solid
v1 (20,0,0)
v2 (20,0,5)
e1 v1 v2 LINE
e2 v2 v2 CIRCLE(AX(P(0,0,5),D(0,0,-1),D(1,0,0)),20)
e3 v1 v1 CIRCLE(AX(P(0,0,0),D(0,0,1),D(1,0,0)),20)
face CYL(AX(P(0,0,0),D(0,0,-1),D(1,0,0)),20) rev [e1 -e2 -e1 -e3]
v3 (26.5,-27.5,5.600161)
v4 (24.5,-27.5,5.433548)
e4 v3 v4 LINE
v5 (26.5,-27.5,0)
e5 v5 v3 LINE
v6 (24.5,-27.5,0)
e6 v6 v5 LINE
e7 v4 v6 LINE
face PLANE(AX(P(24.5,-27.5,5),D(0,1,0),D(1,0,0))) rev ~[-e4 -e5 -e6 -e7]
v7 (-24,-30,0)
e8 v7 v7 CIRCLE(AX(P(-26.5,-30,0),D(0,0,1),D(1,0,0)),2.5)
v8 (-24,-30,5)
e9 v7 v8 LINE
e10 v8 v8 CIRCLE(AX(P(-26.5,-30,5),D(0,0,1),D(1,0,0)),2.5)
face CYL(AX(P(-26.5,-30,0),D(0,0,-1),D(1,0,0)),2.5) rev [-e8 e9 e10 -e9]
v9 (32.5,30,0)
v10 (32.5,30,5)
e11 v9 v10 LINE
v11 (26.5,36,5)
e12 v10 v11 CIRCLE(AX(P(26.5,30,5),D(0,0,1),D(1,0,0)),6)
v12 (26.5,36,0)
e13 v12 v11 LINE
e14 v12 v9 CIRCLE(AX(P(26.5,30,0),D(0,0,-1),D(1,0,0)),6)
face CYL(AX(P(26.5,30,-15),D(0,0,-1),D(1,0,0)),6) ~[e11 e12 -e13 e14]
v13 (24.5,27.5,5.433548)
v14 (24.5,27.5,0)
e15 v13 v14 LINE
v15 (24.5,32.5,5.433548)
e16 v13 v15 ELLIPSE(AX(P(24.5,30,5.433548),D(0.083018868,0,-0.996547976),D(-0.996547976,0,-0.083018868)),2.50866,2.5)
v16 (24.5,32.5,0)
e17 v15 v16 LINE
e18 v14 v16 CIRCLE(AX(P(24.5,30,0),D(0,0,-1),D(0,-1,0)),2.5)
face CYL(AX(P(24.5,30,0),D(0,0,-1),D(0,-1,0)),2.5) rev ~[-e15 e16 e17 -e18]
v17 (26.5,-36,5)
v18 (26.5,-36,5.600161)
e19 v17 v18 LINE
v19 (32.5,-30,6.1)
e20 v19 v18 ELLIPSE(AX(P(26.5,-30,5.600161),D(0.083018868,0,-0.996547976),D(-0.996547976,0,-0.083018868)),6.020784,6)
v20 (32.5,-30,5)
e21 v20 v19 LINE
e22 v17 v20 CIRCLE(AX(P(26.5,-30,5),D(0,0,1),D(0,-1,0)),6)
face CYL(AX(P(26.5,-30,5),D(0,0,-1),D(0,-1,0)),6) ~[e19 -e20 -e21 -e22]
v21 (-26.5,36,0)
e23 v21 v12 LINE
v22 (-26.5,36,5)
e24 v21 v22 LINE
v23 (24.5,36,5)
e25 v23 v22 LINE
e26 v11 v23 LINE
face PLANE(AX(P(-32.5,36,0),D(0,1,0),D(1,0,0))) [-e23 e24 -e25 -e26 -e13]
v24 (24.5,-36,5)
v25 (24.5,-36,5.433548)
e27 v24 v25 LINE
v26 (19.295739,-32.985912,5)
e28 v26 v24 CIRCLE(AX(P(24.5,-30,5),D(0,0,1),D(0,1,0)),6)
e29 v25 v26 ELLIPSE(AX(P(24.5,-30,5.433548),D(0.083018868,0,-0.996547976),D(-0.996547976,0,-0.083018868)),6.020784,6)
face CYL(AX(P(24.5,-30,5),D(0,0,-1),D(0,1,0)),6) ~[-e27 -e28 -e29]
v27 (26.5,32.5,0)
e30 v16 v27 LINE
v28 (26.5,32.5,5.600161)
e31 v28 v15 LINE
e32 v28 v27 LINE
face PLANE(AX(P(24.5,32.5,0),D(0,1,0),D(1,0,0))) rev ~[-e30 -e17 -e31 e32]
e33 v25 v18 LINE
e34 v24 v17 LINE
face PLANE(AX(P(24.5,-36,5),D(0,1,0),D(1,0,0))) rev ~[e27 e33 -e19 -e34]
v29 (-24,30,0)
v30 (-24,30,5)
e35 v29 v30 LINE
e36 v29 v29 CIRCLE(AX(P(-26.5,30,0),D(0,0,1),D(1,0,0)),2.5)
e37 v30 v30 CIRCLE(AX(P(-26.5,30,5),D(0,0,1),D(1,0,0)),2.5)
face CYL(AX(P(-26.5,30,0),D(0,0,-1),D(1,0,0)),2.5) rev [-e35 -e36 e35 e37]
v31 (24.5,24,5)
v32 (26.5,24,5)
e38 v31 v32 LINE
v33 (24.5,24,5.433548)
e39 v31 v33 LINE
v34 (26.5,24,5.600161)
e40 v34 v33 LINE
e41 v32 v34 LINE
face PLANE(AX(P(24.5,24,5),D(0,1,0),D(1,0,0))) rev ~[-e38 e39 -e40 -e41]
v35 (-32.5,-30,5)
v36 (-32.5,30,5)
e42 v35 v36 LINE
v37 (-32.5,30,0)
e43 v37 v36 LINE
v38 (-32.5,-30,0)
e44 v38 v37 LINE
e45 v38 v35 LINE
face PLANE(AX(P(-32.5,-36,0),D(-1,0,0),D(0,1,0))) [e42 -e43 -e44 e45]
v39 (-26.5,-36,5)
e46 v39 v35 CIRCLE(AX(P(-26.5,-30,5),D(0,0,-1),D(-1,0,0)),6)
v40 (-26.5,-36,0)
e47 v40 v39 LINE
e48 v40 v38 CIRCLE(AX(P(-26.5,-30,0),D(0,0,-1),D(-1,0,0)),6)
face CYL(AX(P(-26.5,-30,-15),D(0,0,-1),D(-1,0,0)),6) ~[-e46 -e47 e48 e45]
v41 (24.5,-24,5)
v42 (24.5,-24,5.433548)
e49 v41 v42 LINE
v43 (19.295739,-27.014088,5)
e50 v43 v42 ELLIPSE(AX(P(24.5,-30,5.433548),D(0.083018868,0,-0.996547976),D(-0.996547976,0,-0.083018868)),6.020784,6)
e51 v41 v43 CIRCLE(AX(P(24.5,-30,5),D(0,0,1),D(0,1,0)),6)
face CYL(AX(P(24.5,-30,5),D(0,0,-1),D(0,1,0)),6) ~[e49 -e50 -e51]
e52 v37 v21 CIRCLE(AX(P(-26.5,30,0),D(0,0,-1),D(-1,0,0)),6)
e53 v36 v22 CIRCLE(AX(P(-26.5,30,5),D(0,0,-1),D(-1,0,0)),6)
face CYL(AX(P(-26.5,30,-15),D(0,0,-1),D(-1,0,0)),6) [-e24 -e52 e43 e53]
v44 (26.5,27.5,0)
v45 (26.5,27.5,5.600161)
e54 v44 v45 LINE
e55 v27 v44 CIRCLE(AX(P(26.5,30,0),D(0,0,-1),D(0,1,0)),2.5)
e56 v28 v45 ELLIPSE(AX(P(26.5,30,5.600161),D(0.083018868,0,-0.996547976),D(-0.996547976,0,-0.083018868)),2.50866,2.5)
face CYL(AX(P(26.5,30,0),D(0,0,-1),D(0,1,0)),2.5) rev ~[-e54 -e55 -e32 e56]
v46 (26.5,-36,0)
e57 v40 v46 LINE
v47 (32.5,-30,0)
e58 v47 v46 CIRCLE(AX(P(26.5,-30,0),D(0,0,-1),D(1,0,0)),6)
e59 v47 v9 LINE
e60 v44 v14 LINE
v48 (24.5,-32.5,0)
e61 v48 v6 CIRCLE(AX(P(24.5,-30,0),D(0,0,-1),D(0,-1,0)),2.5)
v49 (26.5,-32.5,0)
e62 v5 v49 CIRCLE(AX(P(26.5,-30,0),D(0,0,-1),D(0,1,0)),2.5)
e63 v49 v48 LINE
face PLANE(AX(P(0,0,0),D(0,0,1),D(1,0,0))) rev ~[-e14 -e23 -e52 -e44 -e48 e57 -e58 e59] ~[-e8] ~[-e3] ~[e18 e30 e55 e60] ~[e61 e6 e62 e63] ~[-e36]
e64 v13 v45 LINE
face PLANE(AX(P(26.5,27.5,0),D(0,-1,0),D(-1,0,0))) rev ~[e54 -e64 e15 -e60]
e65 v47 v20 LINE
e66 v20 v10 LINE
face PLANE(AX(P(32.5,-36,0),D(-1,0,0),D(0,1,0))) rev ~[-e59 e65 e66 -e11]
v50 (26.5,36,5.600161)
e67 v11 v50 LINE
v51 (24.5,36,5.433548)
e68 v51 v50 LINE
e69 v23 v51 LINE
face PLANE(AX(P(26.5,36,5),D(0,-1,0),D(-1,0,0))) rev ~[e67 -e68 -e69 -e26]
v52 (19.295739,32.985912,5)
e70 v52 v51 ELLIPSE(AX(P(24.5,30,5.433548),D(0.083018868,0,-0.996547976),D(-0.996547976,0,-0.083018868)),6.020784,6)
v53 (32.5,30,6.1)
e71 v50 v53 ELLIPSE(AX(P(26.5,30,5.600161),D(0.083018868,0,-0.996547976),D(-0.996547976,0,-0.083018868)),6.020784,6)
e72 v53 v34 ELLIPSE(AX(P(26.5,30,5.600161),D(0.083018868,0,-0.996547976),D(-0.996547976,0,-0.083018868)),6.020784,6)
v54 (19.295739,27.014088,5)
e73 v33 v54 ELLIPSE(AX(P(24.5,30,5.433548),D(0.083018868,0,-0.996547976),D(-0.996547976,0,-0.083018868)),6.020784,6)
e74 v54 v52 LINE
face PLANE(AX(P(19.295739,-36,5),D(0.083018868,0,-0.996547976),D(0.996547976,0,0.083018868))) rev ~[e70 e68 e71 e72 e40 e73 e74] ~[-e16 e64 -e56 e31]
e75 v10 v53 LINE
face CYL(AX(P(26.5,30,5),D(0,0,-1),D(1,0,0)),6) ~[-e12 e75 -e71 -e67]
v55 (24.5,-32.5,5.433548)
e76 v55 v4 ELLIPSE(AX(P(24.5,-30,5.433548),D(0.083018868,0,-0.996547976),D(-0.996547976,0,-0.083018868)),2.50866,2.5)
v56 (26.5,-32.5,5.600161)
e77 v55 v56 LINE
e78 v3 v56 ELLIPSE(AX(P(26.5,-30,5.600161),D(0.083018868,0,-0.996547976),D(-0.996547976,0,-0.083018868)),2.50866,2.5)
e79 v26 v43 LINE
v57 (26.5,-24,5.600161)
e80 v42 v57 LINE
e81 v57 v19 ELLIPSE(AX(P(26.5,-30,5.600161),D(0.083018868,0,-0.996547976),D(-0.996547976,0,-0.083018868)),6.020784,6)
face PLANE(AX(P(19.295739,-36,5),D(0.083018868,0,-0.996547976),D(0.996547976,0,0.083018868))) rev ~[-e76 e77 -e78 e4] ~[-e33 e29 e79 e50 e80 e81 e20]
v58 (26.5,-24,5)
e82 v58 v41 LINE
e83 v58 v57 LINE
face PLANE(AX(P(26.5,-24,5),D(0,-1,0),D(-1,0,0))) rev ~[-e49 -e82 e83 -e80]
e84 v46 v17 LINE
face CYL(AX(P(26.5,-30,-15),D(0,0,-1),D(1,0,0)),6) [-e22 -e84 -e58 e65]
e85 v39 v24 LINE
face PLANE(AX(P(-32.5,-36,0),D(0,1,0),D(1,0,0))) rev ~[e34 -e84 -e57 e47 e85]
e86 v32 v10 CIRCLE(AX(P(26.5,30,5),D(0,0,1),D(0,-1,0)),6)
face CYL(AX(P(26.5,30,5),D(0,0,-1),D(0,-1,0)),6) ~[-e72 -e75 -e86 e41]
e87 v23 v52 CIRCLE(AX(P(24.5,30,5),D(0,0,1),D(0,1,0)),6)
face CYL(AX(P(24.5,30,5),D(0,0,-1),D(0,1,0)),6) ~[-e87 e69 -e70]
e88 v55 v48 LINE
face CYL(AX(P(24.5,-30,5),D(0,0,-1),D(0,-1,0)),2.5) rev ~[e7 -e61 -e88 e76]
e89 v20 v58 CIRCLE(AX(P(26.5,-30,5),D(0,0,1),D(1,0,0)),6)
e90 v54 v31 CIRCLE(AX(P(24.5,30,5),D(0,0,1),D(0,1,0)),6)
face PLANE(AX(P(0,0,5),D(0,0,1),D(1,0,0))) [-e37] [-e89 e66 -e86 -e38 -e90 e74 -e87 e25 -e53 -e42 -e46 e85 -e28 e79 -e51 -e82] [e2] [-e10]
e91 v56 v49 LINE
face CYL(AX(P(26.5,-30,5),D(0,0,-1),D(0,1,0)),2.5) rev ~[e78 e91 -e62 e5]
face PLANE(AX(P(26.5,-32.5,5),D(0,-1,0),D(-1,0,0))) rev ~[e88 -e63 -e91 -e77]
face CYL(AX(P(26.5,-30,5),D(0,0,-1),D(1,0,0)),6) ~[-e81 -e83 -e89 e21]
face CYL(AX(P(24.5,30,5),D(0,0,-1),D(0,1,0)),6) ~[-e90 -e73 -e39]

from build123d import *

# Parameters (mm, degrees)
F0_W        = 65
F0_H        = 72
F0_R        = 2.5
F0_R_2      = 20
F1_DEPTH    = 5
F3_DEPTH    = 1.1
F5_DEPTH    = 72.001
F6_T1_DEPTH = 35


# Not quite as in the source:
# - a fillet or chamfer that OpenCascade refuses, or shapes differently, is made with other operations: its cross-section is extruded or revolved along the edge and cut away or added


with BuildPart() as f1:
    # F0 (on Top) → F1 (new body)
    with BuildSketch(Plane.XY):
        Rectangle(F0_W, F0_H)
        with Locations((-26.5, -30)):
            Circle(F0_R, mode=Mode.SUBTRACT)
        with BuildLine():
            Line((26.5, -32.5), (24.5, -32.5))
            ThreePointArc((24.5, -32.5), (22, -30), (24.5, -27.5))
            Line((24.5, -27.5), (26.5, -27.5))
            ThreePointArc((26.5, -27.5), (29, -30), (26.5, -32.5))
        make_face(mode=Mode.SUBTRACT)
        with Locations((-26.5, 30)):
            Circle(F0_R, mode=Mode.SUBTRACT)
        Circle(F0_R_2, mode=Mode.SUBTRACT)
        with BuildLine():
            Line((26.5, 27.5), (24.5, 27.5))
            ThreePointArc((24.5, 27.5), (22, 30), (24.5, 32.5))
            Line((24.5, 32.5), (26.5, 32.5))
            ThreePointArc((26.5, 32.5), (29, 30), (26.5, 27.5))
        make_face(mode=Mode.SUBTRACT)
    extrude(amount=F1_DEPTH)

    # F2 (on face) → F3 (join)
    with BuildSketch(Plane.XY.offset(5)):
        with BuildLine():
            Line((26.5, -24.0000002086), (24.5, -24.0000002086))
            ThreePointArc((24.5, -24.0000002086), (18.5000002086, -30), (24.5, -35.9999997914))
            Line((24.5, -35.9999997914), (26.5, -35.9999997914))
            ThreePointArc((26.5, -35.9999997914), (30.7426405396, -34.2426405396), (32.4999997914, -30))
            ThreePointArc((32.4999997914, -30), (30.7426405396, -25.7573594604), (26.5, -24.0000002086))
        make_face()
        with BuildLine():
            ThreePointArc((26.5, -27.5), (29, -30), (26.5, -32.5))
            Line((26.5, -32.5), (24.5, -32.5))
            ThreePointArc((24.5, -32.5), (22, -30), (24.5, -27.5))
            Line((24.5, -27.5), (26.5, -27.5))
        make_face(mode=Mode.SUBTRACT)
        with BuildLine():
            ThreePointArc((26.5, 24.0000002086), (30.7426405396, 25.7573594604), (32.4999997914, 30))
            ThreePointArc((32.4999997914, 30), (30.7426405396, 34.2426405396), (26.5, 35.9999997914))
            Line((26.5, 35.9999997914), (24.5, 35.9999997914))
            ThreePointArc((24.5, 35.9999997914), (18.5000002086, 30), (24.5, 24.0000002086))
            Line((24.5, 24.0000002086), (26.5, 24.0000002086))
        make_face()
        with BuildLine():
            ThreePointArc((26.5, 32.5), (29, 30), (26.5, 27.5))
            Line((26.5, 27.5), (24.5, 27.5))
            ThreePointArc((24.5, 27.5), (22, 30), (24.5, 32.5))
            Line((24.5, 32.5), (26.5, 32.5))
        make_face(mode=Mode.SUBTRACT)
    extrude(amount=F3_DEPTH)

    # F4 (on face) → F5 (cut, through all)
    with BuildSketch(Plane.XZ.offset(36)):
        Polygon((19.295739324, 5), (32.5, 6.1), (18.5000002086, 6.1), (18.5000002086, 5), align=None)
    extrude(amount=-F5_DEPTH, mode=Mode.SUBTRACT)

    # F6: fillet of radius 6 on 4 edges, made by hand

    # F6_s2 → F6_t1 (cut)
    with BuildSketch(Plane.XY.offset(-15)):
        with BuildLine():
            ThreePointArc((-32.5, -30), (-30.7426406871, -34.2426406871), (-26.5, -36))
            Line((-26.5, -36), (-32.5, -36))
            Line((-32.5, -36), (-32.5, -30))
        make_face()
        with BuildLine():
            ThreePointArc((-32.5, 30), (-30.7426406871, 34.2426406871), (-26.5, 36))
            Line((-26.5, 36), (-32.5, 36))
            Line((-32.5, 36), (-32.5, 30))
        make_face()
        with BuildLine():
            ThreePointArc((32.5, 30), (30.7426406871, 34.2426406871), (26.5, 36))
            Line((26.5, 36), (32.5, 36))
            Line((32.5, 36), (32.5, 30))
        make_face()
        with BuildLine():
            ThreePointArc((32.5, -30), (30.7426406871, -34.2426406871), (26.5, -36))
            Line((26.5, -36), (32.5, -36))
            Line((32.5, -36), (32.5, -30))
        make_face()
    extrude(amount=F6_T1_DEPTH, mode=Mode.SUBTRACT)


solid = f1.part
